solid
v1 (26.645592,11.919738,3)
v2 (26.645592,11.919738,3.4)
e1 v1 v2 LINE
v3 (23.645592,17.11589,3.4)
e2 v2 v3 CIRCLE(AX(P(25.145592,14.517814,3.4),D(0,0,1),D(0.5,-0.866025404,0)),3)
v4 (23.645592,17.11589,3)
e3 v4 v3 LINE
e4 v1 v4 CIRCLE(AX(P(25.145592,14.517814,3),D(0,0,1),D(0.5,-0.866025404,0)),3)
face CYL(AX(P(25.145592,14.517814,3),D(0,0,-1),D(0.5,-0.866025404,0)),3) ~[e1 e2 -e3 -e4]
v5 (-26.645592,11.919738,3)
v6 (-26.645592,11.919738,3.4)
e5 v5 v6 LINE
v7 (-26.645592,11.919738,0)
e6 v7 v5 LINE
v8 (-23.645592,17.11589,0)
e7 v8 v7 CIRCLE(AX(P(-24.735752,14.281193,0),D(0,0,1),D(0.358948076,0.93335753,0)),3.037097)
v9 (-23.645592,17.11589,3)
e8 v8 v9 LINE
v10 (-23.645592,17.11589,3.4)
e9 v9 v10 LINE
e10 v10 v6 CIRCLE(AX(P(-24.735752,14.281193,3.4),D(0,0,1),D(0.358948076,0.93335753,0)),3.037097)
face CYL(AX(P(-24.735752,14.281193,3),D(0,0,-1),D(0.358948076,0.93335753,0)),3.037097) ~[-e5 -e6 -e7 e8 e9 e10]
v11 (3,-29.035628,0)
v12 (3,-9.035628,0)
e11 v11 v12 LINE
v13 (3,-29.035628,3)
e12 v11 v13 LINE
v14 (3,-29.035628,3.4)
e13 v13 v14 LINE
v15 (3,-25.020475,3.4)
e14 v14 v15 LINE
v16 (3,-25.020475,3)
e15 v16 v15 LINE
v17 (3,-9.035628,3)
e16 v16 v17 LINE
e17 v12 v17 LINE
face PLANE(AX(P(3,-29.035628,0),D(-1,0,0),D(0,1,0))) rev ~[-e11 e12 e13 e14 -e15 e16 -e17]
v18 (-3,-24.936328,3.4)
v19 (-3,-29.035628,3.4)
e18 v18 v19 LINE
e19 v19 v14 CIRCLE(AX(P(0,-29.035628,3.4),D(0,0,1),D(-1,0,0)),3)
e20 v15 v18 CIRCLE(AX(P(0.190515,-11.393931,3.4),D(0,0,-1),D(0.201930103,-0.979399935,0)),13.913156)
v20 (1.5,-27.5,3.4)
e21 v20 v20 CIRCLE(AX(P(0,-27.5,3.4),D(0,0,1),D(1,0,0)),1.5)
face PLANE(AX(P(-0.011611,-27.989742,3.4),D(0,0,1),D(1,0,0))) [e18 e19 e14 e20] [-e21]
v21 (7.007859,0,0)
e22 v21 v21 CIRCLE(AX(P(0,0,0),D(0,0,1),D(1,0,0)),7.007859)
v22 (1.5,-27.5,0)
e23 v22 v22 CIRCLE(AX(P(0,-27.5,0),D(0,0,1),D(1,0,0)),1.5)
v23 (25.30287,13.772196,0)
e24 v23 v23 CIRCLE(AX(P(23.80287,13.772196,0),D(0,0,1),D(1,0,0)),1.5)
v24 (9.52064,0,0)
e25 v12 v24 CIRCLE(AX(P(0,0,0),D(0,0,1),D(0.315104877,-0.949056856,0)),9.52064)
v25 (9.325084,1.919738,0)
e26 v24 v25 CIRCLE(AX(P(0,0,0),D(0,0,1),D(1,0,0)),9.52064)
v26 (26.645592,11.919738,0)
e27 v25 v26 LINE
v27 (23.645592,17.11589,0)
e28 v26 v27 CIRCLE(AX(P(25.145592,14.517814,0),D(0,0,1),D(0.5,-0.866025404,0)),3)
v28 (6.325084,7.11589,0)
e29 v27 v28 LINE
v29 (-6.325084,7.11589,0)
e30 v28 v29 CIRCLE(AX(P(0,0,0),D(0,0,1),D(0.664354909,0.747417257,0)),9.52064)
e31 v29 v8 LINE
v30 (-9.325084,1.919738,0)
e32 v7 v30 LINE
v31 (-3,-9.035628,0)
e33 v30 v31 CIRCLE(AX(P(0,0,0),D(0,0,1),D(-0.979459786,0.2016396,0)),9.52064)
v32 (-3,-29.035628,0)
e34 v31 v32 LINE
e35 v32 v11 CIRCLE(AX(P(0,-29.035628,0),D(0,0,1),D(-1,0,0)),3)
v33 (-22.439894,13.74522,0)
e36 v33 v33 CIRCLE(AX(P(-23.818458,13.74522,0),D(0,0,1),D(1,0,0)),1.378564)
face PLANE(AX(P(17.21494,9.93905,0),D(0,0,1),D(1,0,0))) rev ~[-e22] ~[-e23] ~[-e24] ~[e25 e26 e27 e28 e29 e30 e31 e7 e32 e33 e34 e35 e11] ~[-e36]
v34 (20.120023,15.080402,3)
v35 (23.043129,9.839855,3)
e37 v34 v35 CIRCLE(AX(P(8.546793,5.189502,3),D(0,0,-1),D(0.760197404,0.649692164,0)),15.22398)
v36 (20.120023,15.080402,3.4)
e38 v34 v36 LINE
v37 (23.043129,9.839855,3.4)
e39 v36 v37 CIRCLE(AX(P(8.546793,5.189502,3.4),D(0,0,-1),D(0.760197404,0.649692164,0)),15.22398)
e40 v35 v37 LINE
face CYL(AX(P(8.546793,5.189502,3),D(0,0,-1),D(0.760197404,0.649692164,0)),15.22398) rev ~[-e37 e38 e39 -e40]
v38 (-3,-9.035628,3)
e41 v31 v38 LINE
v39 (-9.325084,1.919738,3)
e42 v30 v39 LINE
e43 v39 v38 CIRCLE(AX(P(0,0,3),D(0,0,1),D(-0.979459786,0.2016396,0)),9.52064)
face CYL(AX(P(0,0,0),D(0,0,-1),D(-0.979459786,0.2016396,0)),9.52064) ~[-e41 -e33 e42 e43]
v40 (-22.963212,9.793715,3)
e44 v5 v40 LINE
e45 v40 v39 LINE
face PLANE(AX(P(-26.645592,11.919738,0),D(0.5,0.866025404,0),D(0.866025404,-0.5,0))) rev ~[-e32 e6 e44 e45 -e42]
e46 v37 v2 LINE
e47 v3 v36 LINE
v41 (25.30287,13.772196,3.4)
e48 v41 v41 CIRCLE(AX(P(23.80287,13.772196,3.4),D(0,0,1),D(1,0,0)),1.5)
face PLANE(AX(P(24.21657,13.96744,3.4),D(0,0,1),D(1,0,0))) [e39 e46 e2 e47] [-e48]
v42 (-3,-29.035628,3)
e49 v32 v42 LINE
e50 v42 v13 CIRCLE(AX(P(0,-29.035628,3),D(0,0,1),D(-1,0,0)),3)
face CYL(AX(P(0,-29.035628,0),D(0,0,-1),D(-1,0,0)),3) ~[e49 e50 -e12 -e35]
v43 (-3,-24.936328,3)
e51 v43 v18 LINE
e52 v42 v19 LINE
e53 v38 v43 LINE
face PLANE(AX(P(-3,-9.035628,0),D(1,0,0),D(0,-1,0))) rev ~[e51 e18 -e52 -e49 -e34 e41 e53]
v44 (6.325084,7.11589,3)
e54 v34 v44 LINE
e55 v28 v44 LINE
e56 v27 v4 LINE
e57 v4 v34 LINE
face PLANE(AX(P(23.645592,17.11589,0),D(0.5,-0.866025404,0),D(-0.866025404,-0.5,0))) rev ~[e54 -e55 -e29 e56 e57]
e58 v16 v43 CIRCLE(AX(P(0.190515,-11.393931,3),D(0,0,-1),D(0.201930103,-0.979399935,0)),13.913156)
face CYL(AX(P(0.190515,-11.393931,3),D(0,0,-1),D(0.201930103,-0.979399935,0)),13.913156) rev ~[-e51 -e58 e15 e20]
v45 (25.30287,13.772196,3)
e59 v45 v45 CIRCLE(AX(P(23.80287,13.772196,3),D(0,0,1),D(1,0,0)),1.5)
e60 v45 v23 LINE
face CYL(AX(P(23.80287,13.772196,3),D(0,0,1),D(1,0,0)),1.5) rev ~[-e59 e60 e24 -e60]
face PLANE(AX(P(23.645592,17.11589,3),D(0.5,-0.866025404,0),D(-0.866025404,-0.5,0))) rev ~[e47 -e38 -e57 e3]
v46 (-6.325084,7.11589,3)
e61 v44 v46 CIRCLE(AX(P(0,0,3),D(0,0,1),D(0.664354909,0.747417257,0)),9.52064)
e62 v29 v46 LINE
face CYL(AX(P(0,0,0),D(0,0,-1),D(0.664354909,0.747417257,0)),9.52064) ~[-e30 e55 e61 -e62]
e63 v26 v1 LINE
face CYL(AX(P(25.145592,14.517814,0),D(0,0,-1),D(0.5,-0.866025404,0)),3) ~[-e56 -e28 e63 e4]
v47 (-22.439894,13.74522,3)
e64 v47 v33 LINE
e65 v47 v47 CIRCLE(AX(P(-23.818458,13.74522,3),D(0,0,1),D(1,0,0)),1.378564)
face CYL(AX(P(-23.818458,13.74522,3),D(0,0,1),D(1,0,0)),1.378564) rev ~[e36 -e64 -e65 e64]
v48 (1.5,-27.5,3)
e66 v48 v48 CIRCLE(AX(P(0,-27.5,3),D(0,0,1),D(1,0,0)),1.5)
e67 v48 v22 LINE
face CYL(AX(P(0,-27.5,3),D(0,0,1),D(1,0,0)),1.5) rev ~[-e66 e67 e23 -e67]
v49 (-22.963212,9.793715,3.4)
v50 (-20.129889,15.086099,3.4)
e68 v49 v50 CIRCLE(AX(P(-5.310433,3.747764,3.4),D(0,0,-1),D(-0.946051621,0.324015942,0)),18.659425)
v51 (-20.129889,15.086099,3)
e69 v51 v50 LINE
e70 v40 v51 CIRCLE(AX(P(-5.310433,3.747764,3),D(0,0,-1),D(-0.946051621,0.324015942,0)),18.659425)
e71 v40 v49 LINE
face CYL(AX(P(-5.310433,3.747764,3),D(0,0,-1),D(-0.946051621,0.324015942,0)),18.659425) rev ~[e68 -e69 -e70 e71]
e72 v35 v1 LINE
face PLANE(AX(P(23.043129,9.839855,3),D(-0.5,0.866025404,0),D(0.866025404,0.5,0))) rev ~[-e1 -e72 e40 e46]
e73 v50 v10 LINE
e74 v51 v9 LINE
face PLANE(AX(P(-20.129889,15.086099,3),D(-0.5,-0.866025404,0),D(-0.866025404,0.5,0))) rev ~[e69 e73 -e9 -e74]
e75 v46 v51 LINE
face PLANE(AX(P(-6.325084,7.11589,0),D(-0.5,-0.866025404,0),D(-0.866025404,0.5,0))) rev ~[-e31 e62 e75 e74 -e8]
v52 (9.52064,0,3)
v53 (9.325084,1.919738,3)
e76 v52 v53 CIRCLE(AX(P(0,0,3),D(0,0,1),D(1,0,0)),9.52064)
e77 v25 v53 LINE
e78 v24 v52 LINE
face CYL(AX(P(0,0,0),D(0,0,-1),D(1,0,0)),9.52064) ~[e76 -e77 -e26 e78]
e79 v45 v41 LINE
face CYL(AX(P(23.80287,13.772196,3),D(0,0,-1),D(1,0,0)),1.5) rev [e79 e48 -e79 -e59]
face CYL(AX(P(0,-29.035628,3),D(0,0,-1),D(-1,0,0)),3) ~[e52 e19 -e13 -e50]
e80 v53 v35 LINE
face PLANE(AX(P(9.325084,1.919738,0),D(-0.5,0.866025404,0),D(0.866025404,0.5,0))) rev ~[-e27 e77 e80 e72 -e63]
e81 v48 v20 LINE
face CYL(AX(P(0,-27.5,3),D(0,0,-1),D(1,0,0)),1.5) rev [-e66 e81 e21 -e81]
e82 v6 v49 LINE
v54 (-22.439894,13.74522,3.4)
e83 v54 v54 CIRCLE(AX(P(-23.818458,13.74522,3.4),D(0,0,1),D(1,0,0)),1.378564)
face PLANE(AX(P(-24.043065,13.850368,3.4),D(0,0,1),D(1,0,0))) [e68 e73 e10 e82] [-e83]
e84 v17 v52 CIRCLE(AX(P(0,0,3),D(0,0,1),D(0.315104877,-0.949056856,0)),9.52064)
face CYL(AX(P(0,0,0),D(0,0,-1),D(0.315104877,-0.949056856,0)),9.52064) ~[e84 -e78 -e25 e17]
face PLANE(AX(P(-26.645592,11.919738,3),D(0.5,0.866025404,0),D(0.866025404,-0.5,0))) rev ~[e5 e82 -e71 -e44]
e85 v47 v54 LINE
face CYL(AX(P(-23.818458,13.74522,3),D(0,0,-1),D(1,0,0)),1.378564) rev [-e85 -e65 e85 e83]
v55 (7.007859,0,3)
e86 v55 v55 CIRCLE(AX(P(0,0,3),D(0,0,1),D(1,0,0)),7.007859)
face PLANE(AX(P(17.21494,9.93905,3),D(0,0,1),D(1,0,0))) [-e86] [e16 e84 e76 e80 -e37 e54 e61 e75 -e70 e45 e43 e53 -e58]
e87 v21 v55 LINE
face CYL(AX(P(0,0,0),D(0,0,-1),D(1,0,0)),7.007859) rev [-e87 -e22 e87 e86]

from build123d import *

# Parameters (mm, degrees)
F1_R     = 7.0078592828
F2_DEPTH = 3
F3_R     = 1.3785641614
F3_R_2   = 1.5
F4_DEPTH = 25
F5_R     = 1.3785641614
F5_R_2   = 1.5
F6_DEPTH = 0.4


# Not quite as in the source:
# - a feature names something its author has since deleted; it is built from what else it names


with BuildPart() as f2:
    # F1 (on Top) → F2 (new body)
    with BuildSketch(Plane.XY):
        with BuildLine():
            ThreePointArc((6.3250837122, 7.115890399), (8.2451158332, 4.7603198458), (9.3250837122, 1.9197379763))
            Line((9.3250837122, 1.9197379763), (26.6455917878, 11.9197379763))
            ThreePointArc((26.6455917878, 11.9197379763), (27.7436679992, 16.0178141876), (23.6455917878, 17.115890399))
            Line((23.6455917878, 17.115890399), (6.3250837122, 7.115890399))
        make_face()
        with BuildLine():
            Line((3, -29.0356283753), (3, -9.0356283753))
            ThreePointArc((3, -9.0356283753), (0, -9.5206396916), (-3, -9.0356283753))
            Line((-3, -9.0356283753), (-3, -29.0356283753))
            ThreePointArc((-3, -29.0356283753), (0, -32.0356283753), (3, -29.0356283753))
        make_face()
        with BuildLine():
            ThreePointArc((3, -9.0356283753), (7.7202493228, -5.5713849742), (9.5206396916, 0))
            ThreePointArc((9.5206396916, 0), (9.4716245242, 0.9648362606), (9.3250837122, 1.9197379763))
            ThreePointArc((9.3250837122, 1.9197379763), (8.2451158332, 4.7603198458), (6.3250837122, 7.115890399))
            ThreePointArc((6.3250837122, 7.115890399), (0, 9.5206396916), (-6.3250837122, 7.115890399))
            ThreePointArc((-6.3250837122, 7.115890399), (-8.2451158332, 4.7603198458), (-9.3250837122, 1.9197379763))
            ThreePointArc((-9.3250837122, 1.9197379763), (-8.2451158332, -4.7603198458), (-3, -9.0356283753))
            ThreePointArc((-3, -9.0356283753), (0, -9.5206396916), (3, -9.0356283753))
        make_face()
        Circle(F1_R, mode=Mode.SUBTRACT)
        with BuildLine():
            ThreePointArc((-9.3250837122, 1.9197379763), (-8.2451158332, 4.7603198458), (-6.3250837122, 7.115890399))
            Line((-6.3250837122, 7.115890399), (-23.6455917878, 17.115890399))
            ThreePointArc((-23.6455917878, 17.115890399), (-27.3659550895, 15.7997415376), (-26.6455917878, 11.9197379763))
            Line((-26.6455917878, 11.9197379763), (-9.3250837122, 1.9197379763))
        make_face()
    extrude(amount=F2_DEPTH)

    # F3 (on face) → F4 (cut)
    with BuildSketch(Plane.XY.offset(3)):
        with Locations((-23.8184579752, 13.7452195212)):
            Circle(F3_R)
        with Locations((23.8028700918, 13.7721957361)):
            Circle(F3_R_2)
        with Locations((0, -27.5)):
            Circle(F3_R_2)
    extrude(amount=-F4_DEPTH, mode=Mode.SUBTRACT)

    # F5 (on face) → F6 (join)
    with BuildSketch(Plane.XY.offset(3)):
        with BuildLine():
            ThreePointArc((-22.963211557, 9.7937147588), (-21.7607776153, 12.554595023), (-20.1298891441, 15.0860985312))
            Line((-20.1298891441, 15.0860985312), (-23.6455917878, 17.115890399))
            ThreePointArc((-23.6455917878, 17.115890399), (-27.3659550895, 15.7997415376), (-26.6455917878, 11.9197379763))
            Line((-26.6455917878, 11.9197379763), (-22.963211557, 9.7937147588))
        make_face()
        with Locations((-23.8184579752, 13.7452195212)):
            Circle(F5_R, mode=Mode.SUBTRACT)
        with BuildLine():
            Line((23.6455917878, 17.115890399), (20.1200227065, 15.0804021408))
            ThreePointArc((20.1200227065, 15.0804021408), (21.8423336439, 12.6055758249), (23.0431293377, 9.839855311))
            Line((23.0431293377, 9.839855311), (26.6455917878, 11.9197379763))
            ThreePointArc((26.6455917878, 11.9197379763), (27.7436679992, 16.0178141876), (23.6455917878, 17.115890399))
        make_face()
        with Locations((23.8028700918, 13.7721957361)):
            Circle(F5_R_2, mode=Mode.SUBTRACT)
        with BuildLine():
            ThreePointArc((3, -25.020474568), (-0.0045904533, -25.3057184102), (-3, -24.9363277107))
            Line((-3, -24.9363277107), (-3, -29.0356283753))
            ThreePointArc((-3, -29.0356283753), (0, -32.0356283753), (3, -29.0356283753))
            Line((3, -29.0356283753), (3, -25.020474568))
        make_face()
        with Locations((0, -27.5)):
            Circle(F5_R_2, mode=Mode.SUBTRACT)
    extrude(amount=F6_DEPTH)


solid = f2.part
